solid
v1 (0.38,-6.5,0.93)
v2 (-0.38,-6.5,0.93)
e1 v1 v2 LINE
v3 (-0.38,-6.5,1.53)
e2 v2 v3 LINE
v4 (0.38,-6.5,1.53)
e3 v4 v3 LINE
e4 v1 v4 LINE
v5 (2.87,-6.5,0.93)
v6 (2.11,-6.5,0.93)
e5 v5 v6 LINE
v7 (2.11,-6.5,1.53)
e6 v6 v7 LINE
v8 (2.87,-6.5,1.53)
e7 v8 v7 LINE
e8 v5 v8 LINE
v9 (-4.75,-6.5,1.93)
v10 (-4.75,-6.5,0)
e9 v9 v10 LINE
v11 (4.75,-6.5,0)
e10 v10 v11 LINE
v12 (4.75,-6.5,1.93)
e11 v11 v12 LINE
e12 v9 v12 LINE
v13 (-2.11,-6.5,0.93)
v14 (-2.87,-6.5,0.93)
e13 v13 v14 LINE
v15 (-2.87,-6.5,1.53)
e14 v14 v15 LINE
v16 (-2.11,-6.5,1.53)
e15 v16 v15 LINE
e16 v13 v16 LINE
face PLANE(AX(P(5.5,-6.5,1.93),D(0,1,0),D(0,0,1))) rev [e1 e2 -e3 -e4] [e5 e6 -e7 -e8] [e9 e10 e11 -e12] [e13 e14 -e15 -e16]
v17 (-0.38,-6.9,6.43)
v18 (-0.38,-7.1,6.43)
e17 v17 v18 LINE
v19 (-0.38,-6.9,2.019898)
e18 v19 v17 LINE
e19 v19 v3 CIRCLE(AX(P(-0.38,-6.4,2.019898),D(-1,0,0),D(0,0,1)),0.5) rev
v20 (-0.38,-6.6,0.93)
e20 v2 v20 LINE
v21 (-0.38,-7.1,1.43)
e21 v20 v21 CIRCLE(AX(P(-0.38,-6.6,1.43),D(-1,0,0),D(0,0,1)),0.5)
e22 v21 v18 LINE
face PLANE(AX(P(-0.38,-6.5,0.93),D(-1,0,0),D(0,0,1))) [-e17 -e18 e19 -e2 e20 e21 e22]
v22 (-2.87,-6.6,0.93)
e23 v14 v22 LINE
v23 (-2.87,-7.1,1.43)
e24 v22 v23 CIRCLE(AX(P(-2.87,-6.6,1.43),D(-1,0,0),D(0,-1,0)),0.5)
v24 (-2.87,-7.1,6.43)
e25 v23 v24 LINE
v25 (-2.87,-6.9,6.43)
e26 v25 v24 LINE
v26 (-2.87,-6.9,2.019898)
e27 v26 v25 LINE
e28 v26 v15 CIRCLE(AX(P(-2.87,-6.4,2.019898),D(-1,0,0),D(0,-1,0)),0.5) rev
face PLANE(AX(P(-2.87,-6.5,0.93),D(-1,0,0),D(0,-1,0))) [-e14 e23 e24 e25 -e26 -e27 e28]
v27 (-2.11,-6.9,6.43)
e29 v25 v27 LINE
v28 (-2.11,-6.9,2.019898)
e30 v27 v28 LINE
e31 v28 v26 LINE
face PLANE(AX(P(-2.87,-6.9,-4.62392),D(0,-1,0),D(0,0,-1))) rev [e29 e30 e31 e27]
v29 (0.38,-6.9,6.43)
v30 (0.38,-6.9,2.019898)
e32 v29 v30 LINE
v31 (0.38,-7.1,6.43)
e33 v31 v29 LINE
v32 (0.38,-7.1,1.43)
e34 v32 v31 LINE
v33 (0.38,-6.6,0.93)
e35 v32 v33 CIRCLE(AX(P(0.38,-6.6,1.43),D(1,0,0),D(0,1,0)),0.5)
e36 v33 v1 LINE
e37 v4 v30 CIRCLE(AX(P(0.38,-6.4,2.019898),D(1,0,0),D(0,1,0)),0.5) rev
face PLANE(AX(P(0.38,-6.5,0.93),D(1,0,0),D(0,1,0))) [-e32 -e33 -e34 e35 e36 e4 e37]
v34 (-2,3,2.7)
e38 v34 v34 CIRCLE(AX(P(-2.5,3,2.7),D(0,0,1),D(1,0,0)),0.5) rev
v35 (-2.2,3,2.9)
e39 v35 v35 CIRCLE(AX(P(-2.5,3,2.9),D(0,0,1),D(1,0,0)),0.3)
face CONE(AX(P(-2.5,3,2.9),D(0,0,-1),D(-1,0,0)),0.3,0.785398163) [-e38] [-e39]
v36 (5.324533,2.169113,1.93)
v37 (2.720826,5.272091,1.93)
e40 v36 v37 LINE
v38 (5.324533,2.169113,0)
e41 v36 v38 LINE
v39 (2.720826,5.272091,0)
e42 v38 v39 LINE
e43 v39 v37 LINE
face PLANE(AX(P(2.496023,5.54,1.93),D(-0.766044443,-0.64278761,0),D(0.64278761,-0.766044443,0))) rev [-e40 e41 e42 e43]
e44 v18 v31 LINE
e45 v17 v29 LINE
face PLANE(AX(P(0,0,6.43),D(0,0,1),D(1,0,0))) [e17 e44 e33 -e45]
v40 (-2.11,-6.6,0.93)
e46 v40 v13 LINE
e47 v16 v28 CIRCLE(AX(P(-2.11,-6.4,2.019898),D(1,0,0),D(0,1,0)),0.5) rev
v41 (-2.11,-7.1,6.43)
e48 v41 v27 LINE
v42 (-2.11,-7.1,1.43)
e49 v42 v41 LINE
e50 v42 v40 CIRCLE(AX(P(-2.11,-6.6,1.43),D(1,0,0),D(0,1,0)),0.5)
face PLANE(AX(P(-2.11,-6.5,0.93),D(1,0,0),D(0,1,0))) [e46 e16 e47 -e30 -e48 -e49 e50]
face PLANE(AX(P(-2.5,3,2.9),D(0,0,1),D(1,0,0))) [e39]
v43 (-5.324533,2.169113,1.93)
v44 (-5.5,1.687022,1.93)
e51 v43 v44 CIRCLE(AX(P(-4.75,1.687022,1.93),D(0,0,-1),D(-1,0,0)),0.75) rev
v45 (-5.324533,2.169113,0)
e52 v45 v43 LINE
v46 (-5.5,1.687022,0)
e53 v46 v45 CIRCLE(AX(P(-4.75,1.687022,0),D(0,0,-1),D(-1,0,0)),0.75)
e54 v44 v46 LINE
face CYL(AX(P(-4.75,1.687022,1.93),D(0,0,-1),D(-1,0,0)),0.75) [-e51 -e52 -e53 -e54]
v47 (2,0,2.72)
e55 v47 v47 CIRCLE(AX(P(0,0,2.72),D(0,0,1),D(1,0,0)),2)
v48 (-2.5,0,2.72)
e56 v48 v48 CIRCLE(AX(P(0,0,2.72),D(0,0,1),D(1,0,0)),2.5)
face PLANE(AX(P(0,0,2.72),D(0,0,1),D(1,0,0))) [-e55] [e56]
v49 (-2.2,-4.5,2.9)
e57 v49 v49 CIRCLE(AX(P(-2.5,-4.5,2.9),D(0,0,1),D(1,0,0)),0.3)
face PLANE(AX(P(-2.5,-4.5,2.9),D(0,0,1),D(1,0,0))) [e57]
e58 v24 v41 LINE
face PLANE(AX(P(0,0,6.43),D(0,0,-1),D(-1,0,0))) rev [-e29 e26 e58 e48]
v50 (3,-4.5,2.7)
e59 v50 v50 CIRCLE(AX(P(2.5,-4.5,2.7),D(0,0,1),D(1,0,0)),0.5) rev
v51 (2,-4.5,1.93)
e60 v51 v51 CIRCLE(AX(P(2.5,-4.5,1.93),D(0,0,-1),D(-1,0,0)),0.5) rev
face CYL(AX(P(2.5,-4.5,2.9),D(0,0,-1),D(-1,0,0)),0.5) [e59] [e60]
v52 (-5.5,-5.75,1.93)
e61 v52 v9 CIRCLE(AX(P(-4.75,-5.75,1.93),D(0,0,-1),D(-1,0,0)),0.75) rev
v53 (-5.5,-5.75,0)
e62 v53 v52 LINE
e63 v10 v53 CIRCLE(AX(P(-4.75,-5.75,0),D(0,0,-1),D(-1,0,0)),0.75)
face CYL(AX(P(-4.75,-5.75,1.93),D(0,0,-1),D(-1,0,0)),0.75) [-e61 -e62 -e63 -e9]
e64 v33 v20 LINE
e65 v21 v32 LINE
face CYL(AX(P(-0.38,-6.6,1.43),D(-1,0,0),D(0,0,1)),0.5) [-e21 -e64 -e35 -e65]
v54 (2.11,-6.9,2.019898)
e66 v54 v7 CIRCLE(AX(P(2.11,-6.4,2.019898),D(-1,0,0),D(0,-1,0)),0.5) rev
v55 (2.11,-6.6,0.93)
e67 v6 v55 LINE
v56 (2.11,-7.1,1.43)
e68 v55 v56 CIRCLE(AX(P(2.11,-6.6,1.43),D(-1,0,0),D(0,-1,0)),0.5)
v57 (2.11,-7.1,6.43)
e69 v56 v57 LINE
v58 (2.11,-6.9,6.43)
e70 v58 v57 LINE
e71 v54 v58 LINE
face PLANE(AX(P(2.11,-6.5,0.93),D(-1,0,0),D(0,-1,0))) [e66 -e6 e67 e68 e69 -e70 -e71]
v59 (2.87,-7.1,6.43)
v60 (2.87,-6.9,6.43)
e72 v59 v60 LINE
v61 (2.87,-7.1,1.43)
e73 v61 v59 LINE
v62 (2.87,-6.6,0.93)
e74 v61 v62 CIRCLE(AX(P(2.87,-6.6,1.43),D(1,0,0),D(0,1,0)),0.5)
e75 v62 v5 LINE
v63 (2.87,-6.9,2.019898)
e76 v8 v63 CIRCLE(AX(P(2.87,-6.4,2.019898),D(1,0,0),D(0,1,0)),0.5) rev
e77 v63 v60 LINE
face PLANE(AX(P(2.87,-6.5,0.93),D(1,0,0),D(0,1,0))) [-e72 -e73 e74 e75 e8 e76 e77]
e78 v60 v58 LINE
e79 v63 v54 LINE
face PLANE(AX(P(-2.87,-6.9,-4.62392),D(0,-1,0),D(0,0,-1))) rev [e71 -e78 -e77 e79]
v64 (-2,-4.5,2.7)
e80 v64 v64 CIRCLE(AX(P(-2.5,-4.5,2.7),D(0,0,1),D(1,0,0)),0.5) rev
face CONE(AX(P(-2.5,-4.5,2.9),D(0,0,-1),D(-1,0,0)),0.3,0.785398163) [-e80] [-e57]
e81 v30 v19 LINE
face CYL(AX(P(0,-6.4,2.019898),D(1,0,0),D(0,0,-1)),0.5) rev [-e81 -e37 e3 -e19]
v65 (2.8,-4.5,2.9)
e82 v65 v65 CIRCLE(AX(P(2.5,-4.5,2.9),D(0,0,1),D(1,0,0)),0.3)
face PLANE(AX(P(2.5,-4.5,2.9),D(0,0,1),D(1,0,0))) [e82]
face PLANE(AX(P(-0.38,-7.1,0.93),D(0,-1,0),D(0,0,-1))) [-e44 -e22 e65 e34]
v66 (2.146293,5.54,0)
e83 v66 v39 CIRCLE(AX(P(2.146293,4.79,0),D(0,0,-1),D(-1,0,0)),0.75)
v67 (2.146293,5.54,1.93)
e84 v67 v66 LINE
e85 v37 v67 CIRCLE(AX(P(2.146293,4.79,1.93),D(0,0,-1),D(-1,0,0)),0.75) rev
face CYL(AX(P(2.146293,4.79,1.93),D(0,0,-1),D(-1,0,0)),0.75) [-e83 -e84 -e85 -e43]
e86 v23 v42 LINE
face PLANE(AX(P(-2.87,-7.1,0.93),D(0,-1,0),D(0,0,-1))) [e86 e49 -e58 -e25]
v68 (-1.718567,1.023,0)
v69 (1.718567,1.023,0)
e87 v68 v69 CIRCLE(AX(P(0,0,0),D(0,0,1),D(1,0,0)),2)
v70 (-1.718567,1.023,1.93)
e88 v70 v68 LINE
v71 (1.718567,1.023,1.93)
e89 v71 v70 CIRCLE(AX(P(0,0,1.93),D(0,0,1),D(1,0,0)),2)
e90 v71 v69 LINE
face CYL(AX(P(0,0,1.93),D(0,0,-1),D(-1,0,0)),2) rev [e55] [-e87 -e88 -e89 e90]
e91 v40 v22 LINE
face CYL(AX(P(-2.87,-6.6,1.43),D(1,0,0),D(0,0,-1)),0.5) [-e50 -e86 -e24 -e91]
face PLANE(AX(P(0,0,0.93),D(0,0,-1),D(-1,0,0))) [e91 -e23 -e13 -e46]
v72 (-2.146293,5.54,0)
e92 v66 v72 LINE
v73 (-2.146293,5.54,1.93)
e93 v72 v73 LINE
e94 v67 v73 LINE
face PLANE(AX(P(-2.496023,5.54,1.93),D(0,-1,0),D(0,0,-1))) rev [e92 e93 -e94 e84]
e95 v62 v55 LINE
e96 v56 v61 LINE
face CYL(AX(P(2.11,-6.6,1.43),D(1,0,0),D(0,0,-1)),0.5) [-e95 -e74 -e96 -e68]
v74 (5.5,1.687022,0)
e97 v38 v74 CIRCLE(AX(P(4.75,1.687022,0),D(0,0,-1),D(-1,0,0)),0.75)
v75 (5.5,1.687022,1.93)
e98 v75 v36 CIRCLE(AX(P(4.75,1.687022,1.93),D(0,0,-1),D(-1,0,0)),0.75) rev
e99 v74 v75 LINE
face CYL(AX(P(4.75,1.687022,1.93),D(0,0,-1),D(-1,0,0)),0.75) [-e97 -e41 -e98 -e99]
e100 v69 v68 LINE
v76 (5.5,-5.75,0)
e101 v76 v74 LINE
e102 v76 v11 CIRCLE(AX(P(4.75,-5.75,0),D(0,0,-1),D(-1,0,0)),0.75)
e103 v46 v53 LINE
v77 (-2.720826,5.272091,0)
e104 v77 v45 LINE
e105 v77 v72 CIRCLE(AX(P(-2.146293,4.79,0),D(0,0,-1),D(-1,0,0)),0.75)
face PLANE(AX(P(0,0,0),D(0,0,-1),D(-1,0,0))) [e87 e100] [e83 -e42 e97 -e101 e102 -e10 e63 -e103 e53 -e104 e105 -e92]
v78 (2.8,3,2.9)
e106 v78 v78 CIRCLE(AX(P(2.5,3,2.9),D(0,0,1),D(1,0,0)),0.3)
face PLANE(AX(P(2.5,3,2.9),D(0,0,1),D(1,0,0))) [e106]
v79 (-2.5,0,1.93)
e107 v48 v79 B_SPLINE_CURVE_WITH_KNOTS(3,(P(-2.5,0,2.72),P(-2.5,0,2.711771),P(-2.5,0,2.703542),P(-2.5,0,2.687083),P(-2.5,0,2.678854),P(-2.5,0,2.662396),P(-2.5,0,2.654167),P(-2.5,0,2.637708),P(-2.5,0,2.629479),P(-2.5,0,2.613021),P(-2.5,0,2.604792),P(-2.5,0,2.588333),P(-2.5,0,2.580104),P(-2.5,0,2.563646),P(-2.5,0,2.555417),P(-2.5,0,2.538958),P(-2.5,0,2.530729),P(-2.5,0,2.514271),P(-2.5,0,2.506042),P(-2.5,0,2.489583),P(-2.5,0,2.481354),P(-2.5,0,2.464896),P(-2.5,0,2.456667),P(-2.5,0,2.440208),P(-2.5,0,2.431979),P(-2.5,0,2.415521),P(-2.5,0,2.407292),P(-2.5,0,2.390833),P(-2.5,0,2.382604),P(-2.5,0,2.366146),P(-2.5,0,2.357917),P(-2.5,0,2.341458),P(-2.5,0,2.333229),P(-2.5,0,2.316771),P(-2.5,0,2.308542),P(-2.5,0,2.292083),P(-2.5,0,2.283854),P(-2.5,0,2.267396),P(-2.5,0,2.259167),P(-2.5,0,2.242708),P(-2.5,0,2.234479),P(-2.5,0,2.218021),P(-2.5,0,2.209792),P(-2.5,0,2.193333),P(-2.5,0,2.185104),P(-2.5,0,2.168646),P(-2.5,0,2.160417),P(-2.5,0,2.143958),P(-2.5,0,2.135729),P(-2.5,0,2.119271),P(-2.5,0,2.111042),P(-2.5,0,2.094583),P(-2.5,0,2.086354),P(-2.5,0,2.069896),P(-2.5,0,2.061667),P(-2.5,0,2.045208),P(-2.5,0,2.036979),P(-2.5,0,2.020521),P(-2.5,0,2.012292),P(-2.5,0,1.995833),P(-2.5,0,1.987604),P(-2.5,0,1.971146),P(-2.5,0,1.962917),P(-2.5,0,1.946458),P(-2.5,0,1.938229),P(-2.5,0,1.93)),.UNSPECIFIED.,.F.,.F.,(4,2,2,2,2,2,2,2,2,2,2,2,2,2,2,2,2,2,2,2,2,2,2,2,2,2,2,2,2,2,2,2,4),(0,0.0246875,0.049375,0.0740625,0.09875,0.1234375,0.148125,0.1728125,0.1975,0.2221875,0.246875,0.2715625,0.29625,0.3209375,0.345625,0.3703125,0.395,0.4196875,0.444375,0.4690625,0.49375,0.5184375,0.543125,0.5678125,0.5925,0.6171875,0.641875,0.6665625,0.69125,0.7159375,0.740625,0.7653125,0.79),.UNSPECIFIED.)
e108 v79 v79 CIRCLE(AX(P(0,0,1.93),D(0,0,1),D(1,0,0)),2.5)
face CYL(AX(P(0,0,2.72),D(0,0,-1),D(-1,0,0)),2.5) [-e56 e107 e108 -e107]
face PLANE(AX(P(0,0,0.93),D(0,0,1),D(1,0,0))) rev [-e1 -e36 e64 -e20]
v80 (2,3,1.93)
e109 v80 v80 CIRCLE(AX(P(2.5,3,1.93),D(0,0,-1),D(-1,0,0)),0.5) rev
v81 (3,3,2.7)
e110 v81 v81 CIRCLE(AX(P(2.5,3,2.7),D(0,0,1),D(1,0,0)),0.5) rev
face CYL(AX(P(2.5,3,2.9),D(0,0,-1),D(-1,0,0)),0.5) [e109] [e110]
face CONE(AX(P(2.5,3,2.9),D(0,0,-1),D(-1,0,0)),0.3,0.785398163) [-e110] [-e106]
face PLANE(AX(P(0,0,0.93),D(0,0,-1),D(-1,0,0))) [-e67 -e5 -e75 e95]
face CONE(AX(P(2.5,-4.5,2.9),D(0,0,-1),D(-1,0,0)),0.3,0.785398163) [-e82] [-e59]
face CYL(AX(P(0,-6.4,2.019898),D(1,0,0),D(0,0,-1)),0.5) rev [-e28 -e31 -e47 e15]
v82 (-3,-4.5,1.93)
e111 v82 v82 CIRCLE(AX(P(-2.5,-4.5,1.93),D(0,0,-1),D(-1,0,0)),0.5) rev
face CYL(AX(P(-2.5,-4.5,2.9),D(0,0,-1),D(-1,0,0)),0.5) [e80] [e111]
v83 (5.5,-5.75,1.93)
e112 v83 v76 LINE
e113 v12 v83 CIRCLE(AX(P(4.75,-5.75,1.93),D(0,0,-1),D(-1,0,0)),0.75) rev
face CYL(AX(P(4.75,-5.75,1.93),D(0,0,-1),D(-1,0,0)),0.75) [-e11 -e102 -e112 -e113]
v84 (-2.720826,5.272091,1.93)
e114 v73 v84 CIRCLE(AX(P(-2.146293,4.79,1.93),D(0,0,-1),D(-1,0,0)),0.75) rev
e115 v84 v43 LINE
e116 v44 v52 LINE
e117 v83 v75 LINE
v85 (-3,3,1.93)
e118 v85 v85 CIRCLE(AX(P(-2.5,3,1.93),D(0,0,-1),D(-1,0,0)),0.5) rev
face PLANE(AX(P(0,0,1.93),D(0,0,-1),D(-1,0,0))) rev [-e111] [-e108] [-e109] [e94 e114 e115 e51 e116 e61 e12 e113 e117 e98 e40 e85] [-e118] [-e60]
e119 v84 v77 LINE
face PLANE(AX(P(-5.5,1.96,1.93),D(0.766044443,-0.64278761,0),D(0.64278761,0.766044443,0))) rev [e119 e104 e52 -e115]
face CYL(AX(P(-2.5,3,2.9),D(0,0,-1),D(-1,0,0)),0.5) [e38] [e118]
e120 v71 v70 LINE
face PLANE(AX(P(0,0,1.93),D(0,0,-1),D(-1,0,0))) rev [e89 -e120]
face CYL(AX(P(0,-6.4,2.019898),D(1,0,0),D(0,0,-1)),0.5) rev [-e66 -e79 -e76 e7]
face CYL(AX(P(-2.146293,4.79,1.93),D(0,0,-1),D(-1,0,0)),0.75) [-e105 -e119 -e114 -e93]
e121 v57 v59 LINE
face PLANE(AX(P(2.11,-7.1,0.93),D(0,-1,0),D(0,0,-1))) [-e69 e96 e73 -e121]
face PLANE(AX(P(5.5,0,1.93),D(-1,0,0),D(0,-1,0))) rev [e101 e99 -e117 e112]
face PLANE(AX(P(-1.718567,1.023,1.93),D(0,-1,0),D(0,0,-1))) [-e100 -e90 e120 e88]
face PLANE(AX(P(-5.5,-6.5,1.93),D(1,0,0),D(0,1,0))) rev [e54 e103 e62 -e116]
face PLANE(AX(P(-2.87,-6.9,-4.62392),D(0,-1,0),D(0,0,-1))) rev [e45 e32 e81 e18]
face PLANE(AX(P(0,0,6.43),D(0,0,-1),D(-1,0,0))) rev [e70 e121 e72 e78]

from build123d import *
from build123d.topology import SkipClean

# Parameters (mm, degrees)
BOSS_EXTRUDE1_DEPTH      = 1.93
SKETCH2_R                = 2.5
SKETCH2_R_2              = 2
BOSS_EXTRUDE2_DEPTH      = 0.79
BOSS_EXTRUDE3_DEPTH      = 4.5
BOSS_EXTRUDE3_DEPTH_BACK = 1
SKETCH3_W                = 0.76
SKETCH3_H                = 0.6
FILLET2_R                = 0.75
SKETCH4_W                = 5.74
SKETCH4_H                = 0.4
CUT_EXTRUDE1_DEPTH       = 4.9
FILLET1_R                = 0.5
SKETCH5_R                = 0.5
BOSS_EXTRUDE4_DEPTH      = 0.97
CHAMFER1_SIZE            = 0.2


with BuildPart() as part:
    # Sketch1 → Boss-Extrude1 (new body)
    with BuildSketch(Plane.XY):
        Polygon((5.5, 0), (5.5, -6.5), (-5.5, -6.5), (-5.5, 0), (-5.5, 1.96), (-2.49602332, 5.54), (2.49602332, 5.54), (5.5, 1.96), align=None)
        with BuildLine():
            Line((-1.718566554, 1.023), (1.718566554, 1.023))
            ThreePointArc((1.718566554, 1.023), (0, -2), (-1.718566554, 1.023))
        make_face(mode=Mode.SUBTRACT)
    extrude(amount=BOSS_EXTRUDE1_DEPTH)

    # Sketch2 → Boss-Extrude2 (add)
    with SkipClean():  # the faces are left unmerged after this step: merging them gives an invalid solid
        with BuildSketch(Plane.XY.offset(1.93)):
            with Locations(Location((0, 0, 0), (0, 0, 180))):
                Circle(SKETCH2_R)
            with Locations(Location((0, 0, 0), (0, 0, 149.236204264))):
                Circle(SKETCH2_R_2, mode=Mode.SUBTRACT)
        extrude(amount=BOSS_EXTRUDE2_DEPTH)

    # Sketch3 → Boss-Extrude3 (add, two sides: drawn at the far end of the back side and taken through both)
    with SkipClean():  # the faces are left unmerged after this step: merging them gives an invalid solid
        with BuildSketch(Plane.XY.offset(1.93).offset(-BOSS_EXTRUDE3_DEPTH_BACK)):
            with Locations((0, -6.8)):
                Rectangle(SKETCH3_W, SKETCH3_H)
            with Locations((2.49, -6.8)):
                Rectangle(SKETCH3_W, SKETCH3_H)
            with Locations((-2.49, -6.8)):
                Rectangle(SKETCH3_W, SKETCH3_H)
        extrude(amount=BOSS_EXTRUDE3_DEPTH + BOSS_EXTRUDE3_DEPTH_BACK)

    # Fillet2
    fillet2_edges = [part.edges().sort_by_distance(p)[0] for p in [
        (5.5, -6.5, 0.965),
        (-5.5, -6.5, 0.965),
        (-5.5, 1.96, 0.965),
        (-2.49602332, 5.54, 0.965),
        (2.49602332, 5.54, 0.965),
        (5.5, 1.96, 0.965),
    ]]
    fillet(fillet2_edges, radius=FILLET2_R)

    # Sketch4 → Cut-Extrude1 (cut)
    with SkipClean():  # the faces are left unmerged after this step: merging them gives an invalid solid
        with BuildSketch(Plane.XY.offset(6.43)):
            with Locations((0, -6.7)):
                Rectangle(SKETCH4_W, SKETCH4_H)
        extrude(amount=-CUT_EXTRUDE1_DEPTH, mode=Mode.SUBTRACT)

    # Fillet1
    # the kernel refuses this fillet: 0.5 mm, written as the material it adds along each edge
    with BuildSketch(Plane(origin=(2.87, -6.9, 1.53), x_dir=(0, 1.0, 1.5715206913564052e-12), z_dir=(-1, 0, 0)), Plane(origin=(0.38, -6.9, 1.53), x_dir=(0, 1.0, 1.5715206913564052e-12), z_dir=(-1, 0, 0)), Plane(origin=(-2.11, -6.9, 1.53), x_dir=(0, 1.0, 1.5715206913564052e-12), z_dir=(-1, 0, 0))) as fillet1_piece_1:
        with BuildLine():
            CenterArc((0.5, -0.489897949), FILLET1_R, 101.536959033, 78.463040967)
            Line((0, -0.489897949), (0, 0))
            Line((0, 0), (0.4, 0))
        make_face()
    extrude(amount=0.76)
    # the kernel refuses this fillet: 0.5 mm, written as the material it takes off along each edge
    with BuildSketch(Plane(origin=(0.86, -7.1, 0.93), x_dir=(0, 1, 0), z_dir=(1, 0, 0)), Plane(origin=(-4.12, -7.1, 0.93), x_dir=(0, 1, 0), z_dir=(1, 0, 0))) as fillet1_2_piece_1:
        with BuildLine():
            CenterArc((FILLET1_R, FILLET1_R), FILLET1_R, 180, 90)
            Line((0, FILLET1_R), (0, 0))
            Line((0, 0), (FILLET1_R, 0))
        make_face()
    extrude(amount=3.26, mode=Mode.SUBTRACT)
    with BuildSketch(Plane(origin=(1.63, -7.1, 0.93), x_dir=(0, 1, 0), z_dir=(-1, 0, 0))) as fillet1_2_piece_2:
        with BuildLine():
            CenterArc((FILLET1_R, -FILLET1_R), FILLET1_R, 90, 90)
            Line((0, -FILLET1_R), (0, 0))
            Line((0, 0), (FILLET1_R, 0))
        make_face()
    extrude(amount=3.26, mode=Mode.SUBTRACT)

    # Sketch5 → Boss-Extrude4 (add)
    with BuildSketch(Plane.XY.offset(1.93)):
        with Locations(Location((-2.5, -4.5, 0), (0, 0, 180))):
            Circle(SKETCH5_R)
        with Locations(Location((2.5, -4.5, 0), (0, 0, 180))):
            Circle(SKETCH5_R)
        with Locations(Location((2.5, 3, 0), (0, 0, 180))):
            Circle(SKETCH5_R)
        with Locations(Location((-2.5, 3, 0), (0, 0, 180))):
            Circle(SKETCH5_R)
    extrude(amount=BOSS_EXTRUDE4_DEPTH)

    # Chamfer1
    chamfer1_edges = [part.edges().sort_by_distance(p)[0] for p in [
        (3, -4.5, 2.9),
        (-2, -4.5, 2.9),
        (3, 3, 2.9),
        (-2, 3, 2.9),
    ]]
    chamfer(chamfer1_edges, length=CHAMFER1_SIZE)


solid = part.part
